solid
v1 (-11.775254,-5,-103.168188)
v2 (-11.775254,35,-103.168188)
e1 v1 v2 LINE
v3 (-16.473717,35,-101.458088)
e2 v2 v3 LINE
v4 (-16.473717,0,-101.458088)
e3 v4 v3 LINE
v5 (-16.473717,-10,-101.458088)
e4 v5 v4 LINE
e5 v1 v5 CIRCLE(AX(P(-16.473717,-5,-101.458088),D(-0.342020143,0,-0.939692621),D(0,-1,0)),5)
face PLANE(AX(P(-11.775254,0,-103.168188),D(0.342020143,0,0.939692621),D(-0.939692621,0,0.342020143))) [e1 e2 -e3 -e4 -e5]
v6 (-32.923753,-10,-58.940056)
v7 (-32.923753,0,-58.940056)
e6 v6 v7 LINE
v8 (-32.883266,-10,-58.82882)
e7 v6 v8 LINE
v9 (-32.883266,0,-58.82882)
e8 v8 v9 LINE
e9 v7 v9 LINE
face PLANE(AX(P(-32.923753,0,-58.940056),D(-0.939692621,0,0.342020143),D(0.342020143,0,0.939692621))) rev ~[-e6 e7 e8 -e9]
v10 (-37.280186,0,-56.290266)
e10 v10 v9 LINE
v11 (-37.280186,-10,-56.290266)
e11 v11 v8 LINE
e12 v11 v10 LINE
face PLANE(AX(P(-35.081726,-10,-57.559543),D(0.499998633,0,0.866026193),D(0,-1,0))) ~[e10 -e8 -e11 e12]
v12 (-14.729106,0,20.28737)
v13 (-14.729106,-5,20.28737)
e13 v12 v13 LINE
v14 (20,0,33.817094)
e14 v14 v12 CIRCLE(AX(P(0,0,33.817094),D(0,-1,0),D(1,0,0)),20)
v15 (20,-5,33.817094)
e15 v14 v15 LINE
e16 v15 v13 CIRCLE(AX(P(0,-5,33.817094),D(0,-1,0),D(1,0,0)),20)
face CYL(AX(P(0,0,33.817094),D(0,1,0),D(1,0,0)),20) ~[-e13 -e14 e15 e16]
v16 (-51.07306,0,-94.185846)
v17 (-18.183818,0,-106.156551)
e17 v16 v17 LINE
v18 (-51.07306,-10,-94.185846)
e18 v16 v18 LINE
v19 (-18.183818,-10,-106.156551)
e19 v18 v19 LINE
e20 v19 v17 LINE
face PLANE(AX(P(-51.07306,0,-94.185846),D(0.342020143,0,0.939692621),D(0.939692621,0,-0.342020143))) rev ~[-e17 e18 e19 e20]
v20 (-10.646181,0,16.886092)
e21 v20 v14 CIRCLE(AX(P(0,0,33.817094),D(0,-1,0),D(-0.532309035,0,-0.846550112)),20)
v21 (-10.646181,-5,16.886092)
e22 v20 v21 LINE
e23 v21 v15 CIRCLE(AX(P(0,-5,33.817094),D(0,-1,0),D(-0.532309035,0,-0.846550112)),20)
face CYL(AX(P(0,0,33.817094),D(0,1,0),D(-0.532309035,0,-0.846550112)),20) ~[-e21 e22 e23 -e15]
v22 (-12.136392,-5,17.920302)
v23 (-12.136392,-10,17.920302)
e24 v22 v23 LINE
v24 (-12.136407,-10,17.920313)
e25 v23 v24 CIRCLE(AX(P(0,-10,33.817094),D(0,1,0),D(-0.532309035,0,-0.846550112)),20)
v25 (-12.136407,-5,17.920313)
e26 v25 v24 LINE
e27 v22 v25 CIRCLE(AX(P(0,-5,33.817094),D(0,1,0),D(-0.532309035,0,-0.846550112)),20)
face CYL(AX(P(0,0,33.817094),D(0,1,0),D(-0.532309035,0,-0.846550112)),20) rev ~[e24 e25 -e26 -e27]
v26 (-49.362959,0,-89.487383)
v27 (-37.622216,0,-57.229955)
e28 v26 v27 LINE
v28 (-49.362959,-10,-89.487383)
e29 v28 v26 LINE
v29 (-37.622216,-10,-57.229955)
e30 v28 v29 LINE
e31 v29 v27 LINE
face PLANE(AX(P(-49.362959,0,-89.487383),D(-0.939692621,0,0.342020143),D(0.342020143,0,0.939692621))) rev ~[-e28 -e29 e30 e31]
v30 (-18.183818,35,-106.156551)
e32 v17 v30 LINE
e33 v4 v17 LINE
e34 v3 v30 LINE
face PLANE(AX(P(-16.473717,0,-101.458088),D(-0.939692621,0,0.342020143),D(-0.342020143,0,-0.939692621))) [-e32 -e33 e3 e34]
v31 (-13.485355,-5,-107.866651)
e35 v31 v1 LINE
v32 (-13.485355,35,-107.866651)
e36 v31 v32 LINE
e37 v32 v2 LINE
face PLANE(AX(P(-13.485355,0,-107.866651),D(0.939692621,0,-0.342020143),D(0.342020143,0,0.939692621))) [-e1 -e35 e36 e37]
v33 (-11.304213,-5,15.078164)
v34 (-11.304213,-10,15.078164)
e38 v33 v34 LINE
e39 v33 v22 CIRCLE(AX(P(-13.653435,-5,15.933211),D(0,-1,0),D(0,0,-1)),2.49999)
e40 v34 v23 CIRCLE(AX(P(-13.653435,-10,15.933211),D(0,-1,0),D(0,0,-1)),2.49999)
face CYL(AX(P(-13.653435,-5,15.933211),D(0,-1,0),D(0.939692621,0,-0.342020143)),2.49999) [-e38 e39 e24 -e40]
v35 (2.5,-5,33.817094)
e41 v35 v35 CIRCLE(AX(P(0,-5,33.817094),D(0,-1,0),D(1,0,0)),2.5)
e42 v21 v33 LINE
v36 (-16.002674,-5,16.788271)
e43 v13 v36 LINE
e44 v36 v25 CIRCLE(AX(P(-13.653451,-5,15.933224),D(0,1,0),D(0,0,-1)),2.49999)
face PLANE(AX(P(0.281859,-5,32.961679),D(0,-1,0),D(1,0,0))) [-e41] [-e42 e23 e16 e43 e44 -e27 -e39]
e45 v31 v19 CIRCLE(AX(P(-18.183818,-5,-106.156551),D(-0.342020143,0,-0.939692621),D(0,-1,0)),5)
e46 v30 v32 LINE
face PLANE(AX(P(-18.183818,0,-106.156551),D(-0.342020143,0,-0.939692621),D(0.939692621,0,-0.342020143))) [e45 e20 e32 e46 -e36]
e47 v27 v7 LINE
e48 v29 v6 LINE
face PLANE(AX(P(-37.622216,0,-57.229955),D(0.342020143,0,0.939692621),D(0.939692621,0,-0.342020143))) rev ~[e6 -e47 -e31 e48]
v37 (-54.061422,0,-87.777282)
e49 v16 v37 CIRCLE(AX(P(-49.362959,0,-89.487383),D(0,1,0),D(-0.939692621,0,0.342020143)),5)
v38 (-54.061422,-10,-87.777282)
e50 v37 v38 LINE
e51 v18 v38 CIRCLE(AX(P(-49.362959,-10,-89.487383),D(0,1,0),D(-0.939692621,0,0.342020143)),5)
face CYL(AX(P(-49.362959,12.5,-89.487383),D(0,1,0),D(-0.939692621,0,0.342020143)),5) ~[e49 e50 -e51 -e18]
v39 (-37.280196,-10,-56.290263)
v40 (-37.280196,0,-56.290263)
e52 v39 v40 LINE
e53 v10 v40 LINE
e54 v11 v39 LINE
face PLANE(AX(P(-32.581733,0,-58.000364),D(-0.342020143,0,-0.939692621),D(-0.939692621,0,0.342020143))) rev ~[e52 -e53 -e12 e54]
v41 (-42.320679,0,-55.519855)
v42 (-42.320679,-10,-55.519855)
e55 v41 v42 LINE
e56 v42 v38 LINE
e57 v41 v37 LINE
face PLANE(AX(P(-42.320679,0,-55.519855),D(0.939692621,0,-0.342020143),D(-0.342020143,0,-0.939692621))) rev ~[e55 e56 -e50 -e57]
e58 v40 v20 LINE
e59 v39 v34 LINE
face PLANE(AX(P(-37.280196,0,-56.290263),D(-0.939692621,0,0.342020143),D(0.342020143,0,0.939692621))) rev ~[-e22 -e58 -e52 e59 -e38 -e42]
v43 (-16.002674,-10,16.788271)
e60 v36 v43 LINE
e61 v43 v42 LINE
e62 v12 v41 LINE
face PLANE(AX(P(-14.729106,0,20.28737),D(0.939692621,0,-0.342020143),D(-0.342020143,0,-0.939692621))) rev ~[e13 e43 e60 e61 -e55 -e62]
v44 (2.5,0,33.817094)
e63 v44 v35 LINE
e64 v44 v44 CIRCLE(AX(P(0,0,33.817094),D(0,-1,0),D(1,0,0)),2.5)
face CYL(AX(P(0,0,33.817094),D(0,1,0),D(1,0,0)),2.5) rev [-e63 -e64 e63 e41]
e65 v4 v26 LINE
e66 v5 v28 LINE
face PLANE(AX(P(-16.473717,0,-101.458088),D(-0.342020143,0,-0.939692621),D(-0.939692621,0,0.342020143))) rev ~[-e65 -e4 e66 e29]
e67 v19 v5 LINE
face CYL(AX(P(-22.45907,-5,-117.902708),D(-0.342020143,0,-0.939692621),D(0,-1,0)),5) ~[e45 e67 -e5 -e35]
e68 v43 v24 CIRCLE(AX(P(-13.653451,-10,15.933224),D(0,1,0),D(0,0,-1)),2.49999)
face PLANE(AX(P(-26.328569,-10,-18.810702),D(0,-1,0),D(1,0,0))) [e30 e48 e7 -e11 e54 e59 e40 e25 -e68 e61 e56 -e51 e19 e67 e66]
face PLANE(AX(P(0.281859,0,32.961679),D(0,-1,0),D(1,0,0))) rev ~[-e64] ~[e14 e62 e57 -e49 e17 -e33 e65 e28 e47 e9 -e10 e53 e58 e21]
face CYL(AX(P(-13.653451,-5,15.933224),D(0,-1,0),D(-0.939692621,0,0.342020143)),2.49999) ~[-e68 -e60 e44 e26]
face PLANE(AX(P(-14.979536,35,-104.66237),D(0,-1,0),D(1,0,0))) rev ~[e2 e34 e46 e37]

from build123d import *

# Parameters (mm, degrees)
F0_R        = 2.5
F1_DEPTH    = 5
F2_DEPTH    = 10
F3_R        = 2.49999
F4_T1_DEPTH = 35
F4_T3_DEPTH = 30
F5_SIZE2    = 0.881625
F5_SIZE     = 4.99999
F6_DEPTH    = 35


# Not quite as in the source:
# - a fillet or chamfer that OpenCascade refuses, or shapes differently, is made with other operations: its cross-section is extruded or revolved along the edge and cut away or added
# - a fillet or chamfer is up to 0.001 mm smaller than in the source, because OpenCascade refuses the exact size


with BuildPart() as f1:
    # F0 (on Front) → F1 (new body)
    with BuildSketch(Plane.XZ):
        with BuildLine():
            ThreePointArc((20, 33.8170940264), (-7.2600924867, 52.4528407806), (-14.7291057085, 20.287369527))
            ThreePointArc((-14.7291057085, 20.287369527), (-12.8011117725, 18.4505219497), (-10.6461806987, 16.8860917959))
            ThreePointArc((-10.6461806987, 16.8860917959), (9.671514515, 16.3110434442), (20, 33.8170940264))
        make_face()
        with Locations((0, 33.8170940264)):
            Circle(F0_R, mode=Mode.SUBTRACT)
        with BuildLine():
            Line((-42.3206788698, -55.5198547009), (-37.6222157658, -57.2299554175))
            Line((-37.6222157658, -57.2299554175), (-37.2801956225, -56.2902627967))
            Line((-37.2801956225, -56.2902627967), (-10.6461806987, 16.8860917959))
            ThreePointArc((-10.6461806987, 16.8860917959), (-12.8011117725, 18.4505219497), (-14.7291057085, 20.287369527))
            Line((-14.7291057085, 20.287369527), (-42.3206788698, -55.5198547009))
        make_face()
        Polygon((-37.2801956225, -56.2902627967), (-37.6222157658, -57.2299554175), (-32.9237526619, -58.9400561341), (-32.5817325186, -58.0003635134), align=None)
        Polygon((-49.362959087, -89.48738258), (-37.6222157658, -57.2299554175), (-42.3206788698, -55.5198547009), (-55.7715229075, -92.4757449673), (-51.0730598036, -94.1858456839), align=None)
        Polygon((-16.4737173595, -101.4580875964), (-49.362959087, -89.48738258), (-51.0730598036, -94.1858456839), (-18.1838180761, -106.1565507003), align=None)
        Polygon((-11.7752542555, -103.168188313), (-16.4737173595, -101.4580875964), (-18.1838180761, -106.1565507003), (-13.4853549722, -107.8666514169), align=None)
    extrude(amount=F1_DEPTH)

    # F0 (on Front) → F2 (join)
    with BuildSketch(Plane.XZ):
        with BuildLine():
            Line((-42.3206788698, -55.5198547009), (-37.6222157658, -57.2299554175))
            Line((-37.6222157658, -57.2299554175), (-37.2801956225, -56.2902627967))
            Line((-37.2801956225, -56.2902627967), (-10.6461806987, 16.8860917959))
            ThreePointArc((-10.6461806987, 16.8860917959), (-12.8011117725, 18.4505219497), (-14.7291057085, 20.287369527))
            Line((-14.7291057085, 20.287369527), (-42.3206788698, -55.5198547009))
        make_face()
        Polygon((-49.362959087, -89.48738258), (-37.6222157658, -57.2299554175), (-42.3206788698, -55.5198547009), (-55.7715229075, -92.4757449673), (-51.0730598036, -94.1858456839), align=None)
        Polygon((-16.4737173595, -101.4580875964), (-49.362959087, -89.48738258), (-51.0730598036, -94.1858456839), (-18.1838180761, -106.1565507003), align=None)
        Polygon((-11.7752542555, -103.168188313), (-16.4737173595, -101.4580875964), (-18.1838180761, -106.1565507003), (-13.4853549722, -107.8666514169), align=None)
        Polygon((-37.2801956225, -56.2902627967), (-37.6222157658, -57.2299554175), (-32.9237526619, -58.9400561341), (-32.5817325186, -58.0003635134), align=None)
    extrude(amount=F2_DEPTH)

    # F3 (radius 2.5 in the source; OpenCascade refuses exactly that, so slightly less here)
    f3_edges = [f1.edges().sort_by_distance(p)[0] for p in [
        (-10.646181, -7.5, 16.886092),
        (-14.729106, -7.5, 20.28737),
    ]]
    fillet(f3_edges, radius=F3_R)

    # F4: fillet of radius 5 on 2 edges, made by hand

    # F4_s2 → F4_t1 (cut)
    with BuildSketch(Plane.XZ.offset(-12.5)):
        with BuildLine():
            ThreePointArc((-54.0614221909, -87.7772818634), (-53.8944980222, -91.6004738887), (-51.0730598036, -94.1858456839))
            Line((-51.0730598036, -94.1858456839), (-55.7715229075, -92.4757449673))
            Line((-55.7715229075, -92.4757449673), (-54.0614221909, -87.7772818634))
        make_face()
    extrude(amount=F4_T1_DEPTH, mode=Mode.SUBTRACT)

    # F4_s4 → F4_t3 (cut)
    with BuildSketch(Plane(origin=(-40.5204121723, 0, -111.3289174704), x_dir=(0, 1, 0), z_dir=(0.3420201433, 0, 0.9396926208))):
        with BuildLine():
            ThreePointArc((-10, -19.2204790217), (-8.5355339059, -22.7560129276), (-5, -24.2204790217))
            Line((-5, -24.2204790217), (-10, -24.2204790217))
            Line((-10, -24.2204790217), (-10, -19.2204790217))
        make_face()
    extrude(amount=F4_T3_DEPTH, mode=Mode.SUBTRACT)

    # F5 (size 5 and 0.8816349035 in the source; OpenCascade refuses exactly that, so slightly less here)
    f5_edges = [f1.edges().sort_by_distance(p)[0] for p in [
        (-32.581733, -5, -58.000364),
    ]]
    chamfer(f5_edges, length=F5_SIZE, length2=F5_SIZE2)

    # F0 (on Front) → F6 (join)
    with BuildSketch(Plane.XZ):
        Polygon((-11.7752542555, -103.168188313), (-16.4737173595, -101.4580875964), (-18.1838180761, -106.1565507003), (-13.4853549722, -107.8666514169), align=None)
    extrude(amount=-F6_DEPTH)


solid = f1.part
